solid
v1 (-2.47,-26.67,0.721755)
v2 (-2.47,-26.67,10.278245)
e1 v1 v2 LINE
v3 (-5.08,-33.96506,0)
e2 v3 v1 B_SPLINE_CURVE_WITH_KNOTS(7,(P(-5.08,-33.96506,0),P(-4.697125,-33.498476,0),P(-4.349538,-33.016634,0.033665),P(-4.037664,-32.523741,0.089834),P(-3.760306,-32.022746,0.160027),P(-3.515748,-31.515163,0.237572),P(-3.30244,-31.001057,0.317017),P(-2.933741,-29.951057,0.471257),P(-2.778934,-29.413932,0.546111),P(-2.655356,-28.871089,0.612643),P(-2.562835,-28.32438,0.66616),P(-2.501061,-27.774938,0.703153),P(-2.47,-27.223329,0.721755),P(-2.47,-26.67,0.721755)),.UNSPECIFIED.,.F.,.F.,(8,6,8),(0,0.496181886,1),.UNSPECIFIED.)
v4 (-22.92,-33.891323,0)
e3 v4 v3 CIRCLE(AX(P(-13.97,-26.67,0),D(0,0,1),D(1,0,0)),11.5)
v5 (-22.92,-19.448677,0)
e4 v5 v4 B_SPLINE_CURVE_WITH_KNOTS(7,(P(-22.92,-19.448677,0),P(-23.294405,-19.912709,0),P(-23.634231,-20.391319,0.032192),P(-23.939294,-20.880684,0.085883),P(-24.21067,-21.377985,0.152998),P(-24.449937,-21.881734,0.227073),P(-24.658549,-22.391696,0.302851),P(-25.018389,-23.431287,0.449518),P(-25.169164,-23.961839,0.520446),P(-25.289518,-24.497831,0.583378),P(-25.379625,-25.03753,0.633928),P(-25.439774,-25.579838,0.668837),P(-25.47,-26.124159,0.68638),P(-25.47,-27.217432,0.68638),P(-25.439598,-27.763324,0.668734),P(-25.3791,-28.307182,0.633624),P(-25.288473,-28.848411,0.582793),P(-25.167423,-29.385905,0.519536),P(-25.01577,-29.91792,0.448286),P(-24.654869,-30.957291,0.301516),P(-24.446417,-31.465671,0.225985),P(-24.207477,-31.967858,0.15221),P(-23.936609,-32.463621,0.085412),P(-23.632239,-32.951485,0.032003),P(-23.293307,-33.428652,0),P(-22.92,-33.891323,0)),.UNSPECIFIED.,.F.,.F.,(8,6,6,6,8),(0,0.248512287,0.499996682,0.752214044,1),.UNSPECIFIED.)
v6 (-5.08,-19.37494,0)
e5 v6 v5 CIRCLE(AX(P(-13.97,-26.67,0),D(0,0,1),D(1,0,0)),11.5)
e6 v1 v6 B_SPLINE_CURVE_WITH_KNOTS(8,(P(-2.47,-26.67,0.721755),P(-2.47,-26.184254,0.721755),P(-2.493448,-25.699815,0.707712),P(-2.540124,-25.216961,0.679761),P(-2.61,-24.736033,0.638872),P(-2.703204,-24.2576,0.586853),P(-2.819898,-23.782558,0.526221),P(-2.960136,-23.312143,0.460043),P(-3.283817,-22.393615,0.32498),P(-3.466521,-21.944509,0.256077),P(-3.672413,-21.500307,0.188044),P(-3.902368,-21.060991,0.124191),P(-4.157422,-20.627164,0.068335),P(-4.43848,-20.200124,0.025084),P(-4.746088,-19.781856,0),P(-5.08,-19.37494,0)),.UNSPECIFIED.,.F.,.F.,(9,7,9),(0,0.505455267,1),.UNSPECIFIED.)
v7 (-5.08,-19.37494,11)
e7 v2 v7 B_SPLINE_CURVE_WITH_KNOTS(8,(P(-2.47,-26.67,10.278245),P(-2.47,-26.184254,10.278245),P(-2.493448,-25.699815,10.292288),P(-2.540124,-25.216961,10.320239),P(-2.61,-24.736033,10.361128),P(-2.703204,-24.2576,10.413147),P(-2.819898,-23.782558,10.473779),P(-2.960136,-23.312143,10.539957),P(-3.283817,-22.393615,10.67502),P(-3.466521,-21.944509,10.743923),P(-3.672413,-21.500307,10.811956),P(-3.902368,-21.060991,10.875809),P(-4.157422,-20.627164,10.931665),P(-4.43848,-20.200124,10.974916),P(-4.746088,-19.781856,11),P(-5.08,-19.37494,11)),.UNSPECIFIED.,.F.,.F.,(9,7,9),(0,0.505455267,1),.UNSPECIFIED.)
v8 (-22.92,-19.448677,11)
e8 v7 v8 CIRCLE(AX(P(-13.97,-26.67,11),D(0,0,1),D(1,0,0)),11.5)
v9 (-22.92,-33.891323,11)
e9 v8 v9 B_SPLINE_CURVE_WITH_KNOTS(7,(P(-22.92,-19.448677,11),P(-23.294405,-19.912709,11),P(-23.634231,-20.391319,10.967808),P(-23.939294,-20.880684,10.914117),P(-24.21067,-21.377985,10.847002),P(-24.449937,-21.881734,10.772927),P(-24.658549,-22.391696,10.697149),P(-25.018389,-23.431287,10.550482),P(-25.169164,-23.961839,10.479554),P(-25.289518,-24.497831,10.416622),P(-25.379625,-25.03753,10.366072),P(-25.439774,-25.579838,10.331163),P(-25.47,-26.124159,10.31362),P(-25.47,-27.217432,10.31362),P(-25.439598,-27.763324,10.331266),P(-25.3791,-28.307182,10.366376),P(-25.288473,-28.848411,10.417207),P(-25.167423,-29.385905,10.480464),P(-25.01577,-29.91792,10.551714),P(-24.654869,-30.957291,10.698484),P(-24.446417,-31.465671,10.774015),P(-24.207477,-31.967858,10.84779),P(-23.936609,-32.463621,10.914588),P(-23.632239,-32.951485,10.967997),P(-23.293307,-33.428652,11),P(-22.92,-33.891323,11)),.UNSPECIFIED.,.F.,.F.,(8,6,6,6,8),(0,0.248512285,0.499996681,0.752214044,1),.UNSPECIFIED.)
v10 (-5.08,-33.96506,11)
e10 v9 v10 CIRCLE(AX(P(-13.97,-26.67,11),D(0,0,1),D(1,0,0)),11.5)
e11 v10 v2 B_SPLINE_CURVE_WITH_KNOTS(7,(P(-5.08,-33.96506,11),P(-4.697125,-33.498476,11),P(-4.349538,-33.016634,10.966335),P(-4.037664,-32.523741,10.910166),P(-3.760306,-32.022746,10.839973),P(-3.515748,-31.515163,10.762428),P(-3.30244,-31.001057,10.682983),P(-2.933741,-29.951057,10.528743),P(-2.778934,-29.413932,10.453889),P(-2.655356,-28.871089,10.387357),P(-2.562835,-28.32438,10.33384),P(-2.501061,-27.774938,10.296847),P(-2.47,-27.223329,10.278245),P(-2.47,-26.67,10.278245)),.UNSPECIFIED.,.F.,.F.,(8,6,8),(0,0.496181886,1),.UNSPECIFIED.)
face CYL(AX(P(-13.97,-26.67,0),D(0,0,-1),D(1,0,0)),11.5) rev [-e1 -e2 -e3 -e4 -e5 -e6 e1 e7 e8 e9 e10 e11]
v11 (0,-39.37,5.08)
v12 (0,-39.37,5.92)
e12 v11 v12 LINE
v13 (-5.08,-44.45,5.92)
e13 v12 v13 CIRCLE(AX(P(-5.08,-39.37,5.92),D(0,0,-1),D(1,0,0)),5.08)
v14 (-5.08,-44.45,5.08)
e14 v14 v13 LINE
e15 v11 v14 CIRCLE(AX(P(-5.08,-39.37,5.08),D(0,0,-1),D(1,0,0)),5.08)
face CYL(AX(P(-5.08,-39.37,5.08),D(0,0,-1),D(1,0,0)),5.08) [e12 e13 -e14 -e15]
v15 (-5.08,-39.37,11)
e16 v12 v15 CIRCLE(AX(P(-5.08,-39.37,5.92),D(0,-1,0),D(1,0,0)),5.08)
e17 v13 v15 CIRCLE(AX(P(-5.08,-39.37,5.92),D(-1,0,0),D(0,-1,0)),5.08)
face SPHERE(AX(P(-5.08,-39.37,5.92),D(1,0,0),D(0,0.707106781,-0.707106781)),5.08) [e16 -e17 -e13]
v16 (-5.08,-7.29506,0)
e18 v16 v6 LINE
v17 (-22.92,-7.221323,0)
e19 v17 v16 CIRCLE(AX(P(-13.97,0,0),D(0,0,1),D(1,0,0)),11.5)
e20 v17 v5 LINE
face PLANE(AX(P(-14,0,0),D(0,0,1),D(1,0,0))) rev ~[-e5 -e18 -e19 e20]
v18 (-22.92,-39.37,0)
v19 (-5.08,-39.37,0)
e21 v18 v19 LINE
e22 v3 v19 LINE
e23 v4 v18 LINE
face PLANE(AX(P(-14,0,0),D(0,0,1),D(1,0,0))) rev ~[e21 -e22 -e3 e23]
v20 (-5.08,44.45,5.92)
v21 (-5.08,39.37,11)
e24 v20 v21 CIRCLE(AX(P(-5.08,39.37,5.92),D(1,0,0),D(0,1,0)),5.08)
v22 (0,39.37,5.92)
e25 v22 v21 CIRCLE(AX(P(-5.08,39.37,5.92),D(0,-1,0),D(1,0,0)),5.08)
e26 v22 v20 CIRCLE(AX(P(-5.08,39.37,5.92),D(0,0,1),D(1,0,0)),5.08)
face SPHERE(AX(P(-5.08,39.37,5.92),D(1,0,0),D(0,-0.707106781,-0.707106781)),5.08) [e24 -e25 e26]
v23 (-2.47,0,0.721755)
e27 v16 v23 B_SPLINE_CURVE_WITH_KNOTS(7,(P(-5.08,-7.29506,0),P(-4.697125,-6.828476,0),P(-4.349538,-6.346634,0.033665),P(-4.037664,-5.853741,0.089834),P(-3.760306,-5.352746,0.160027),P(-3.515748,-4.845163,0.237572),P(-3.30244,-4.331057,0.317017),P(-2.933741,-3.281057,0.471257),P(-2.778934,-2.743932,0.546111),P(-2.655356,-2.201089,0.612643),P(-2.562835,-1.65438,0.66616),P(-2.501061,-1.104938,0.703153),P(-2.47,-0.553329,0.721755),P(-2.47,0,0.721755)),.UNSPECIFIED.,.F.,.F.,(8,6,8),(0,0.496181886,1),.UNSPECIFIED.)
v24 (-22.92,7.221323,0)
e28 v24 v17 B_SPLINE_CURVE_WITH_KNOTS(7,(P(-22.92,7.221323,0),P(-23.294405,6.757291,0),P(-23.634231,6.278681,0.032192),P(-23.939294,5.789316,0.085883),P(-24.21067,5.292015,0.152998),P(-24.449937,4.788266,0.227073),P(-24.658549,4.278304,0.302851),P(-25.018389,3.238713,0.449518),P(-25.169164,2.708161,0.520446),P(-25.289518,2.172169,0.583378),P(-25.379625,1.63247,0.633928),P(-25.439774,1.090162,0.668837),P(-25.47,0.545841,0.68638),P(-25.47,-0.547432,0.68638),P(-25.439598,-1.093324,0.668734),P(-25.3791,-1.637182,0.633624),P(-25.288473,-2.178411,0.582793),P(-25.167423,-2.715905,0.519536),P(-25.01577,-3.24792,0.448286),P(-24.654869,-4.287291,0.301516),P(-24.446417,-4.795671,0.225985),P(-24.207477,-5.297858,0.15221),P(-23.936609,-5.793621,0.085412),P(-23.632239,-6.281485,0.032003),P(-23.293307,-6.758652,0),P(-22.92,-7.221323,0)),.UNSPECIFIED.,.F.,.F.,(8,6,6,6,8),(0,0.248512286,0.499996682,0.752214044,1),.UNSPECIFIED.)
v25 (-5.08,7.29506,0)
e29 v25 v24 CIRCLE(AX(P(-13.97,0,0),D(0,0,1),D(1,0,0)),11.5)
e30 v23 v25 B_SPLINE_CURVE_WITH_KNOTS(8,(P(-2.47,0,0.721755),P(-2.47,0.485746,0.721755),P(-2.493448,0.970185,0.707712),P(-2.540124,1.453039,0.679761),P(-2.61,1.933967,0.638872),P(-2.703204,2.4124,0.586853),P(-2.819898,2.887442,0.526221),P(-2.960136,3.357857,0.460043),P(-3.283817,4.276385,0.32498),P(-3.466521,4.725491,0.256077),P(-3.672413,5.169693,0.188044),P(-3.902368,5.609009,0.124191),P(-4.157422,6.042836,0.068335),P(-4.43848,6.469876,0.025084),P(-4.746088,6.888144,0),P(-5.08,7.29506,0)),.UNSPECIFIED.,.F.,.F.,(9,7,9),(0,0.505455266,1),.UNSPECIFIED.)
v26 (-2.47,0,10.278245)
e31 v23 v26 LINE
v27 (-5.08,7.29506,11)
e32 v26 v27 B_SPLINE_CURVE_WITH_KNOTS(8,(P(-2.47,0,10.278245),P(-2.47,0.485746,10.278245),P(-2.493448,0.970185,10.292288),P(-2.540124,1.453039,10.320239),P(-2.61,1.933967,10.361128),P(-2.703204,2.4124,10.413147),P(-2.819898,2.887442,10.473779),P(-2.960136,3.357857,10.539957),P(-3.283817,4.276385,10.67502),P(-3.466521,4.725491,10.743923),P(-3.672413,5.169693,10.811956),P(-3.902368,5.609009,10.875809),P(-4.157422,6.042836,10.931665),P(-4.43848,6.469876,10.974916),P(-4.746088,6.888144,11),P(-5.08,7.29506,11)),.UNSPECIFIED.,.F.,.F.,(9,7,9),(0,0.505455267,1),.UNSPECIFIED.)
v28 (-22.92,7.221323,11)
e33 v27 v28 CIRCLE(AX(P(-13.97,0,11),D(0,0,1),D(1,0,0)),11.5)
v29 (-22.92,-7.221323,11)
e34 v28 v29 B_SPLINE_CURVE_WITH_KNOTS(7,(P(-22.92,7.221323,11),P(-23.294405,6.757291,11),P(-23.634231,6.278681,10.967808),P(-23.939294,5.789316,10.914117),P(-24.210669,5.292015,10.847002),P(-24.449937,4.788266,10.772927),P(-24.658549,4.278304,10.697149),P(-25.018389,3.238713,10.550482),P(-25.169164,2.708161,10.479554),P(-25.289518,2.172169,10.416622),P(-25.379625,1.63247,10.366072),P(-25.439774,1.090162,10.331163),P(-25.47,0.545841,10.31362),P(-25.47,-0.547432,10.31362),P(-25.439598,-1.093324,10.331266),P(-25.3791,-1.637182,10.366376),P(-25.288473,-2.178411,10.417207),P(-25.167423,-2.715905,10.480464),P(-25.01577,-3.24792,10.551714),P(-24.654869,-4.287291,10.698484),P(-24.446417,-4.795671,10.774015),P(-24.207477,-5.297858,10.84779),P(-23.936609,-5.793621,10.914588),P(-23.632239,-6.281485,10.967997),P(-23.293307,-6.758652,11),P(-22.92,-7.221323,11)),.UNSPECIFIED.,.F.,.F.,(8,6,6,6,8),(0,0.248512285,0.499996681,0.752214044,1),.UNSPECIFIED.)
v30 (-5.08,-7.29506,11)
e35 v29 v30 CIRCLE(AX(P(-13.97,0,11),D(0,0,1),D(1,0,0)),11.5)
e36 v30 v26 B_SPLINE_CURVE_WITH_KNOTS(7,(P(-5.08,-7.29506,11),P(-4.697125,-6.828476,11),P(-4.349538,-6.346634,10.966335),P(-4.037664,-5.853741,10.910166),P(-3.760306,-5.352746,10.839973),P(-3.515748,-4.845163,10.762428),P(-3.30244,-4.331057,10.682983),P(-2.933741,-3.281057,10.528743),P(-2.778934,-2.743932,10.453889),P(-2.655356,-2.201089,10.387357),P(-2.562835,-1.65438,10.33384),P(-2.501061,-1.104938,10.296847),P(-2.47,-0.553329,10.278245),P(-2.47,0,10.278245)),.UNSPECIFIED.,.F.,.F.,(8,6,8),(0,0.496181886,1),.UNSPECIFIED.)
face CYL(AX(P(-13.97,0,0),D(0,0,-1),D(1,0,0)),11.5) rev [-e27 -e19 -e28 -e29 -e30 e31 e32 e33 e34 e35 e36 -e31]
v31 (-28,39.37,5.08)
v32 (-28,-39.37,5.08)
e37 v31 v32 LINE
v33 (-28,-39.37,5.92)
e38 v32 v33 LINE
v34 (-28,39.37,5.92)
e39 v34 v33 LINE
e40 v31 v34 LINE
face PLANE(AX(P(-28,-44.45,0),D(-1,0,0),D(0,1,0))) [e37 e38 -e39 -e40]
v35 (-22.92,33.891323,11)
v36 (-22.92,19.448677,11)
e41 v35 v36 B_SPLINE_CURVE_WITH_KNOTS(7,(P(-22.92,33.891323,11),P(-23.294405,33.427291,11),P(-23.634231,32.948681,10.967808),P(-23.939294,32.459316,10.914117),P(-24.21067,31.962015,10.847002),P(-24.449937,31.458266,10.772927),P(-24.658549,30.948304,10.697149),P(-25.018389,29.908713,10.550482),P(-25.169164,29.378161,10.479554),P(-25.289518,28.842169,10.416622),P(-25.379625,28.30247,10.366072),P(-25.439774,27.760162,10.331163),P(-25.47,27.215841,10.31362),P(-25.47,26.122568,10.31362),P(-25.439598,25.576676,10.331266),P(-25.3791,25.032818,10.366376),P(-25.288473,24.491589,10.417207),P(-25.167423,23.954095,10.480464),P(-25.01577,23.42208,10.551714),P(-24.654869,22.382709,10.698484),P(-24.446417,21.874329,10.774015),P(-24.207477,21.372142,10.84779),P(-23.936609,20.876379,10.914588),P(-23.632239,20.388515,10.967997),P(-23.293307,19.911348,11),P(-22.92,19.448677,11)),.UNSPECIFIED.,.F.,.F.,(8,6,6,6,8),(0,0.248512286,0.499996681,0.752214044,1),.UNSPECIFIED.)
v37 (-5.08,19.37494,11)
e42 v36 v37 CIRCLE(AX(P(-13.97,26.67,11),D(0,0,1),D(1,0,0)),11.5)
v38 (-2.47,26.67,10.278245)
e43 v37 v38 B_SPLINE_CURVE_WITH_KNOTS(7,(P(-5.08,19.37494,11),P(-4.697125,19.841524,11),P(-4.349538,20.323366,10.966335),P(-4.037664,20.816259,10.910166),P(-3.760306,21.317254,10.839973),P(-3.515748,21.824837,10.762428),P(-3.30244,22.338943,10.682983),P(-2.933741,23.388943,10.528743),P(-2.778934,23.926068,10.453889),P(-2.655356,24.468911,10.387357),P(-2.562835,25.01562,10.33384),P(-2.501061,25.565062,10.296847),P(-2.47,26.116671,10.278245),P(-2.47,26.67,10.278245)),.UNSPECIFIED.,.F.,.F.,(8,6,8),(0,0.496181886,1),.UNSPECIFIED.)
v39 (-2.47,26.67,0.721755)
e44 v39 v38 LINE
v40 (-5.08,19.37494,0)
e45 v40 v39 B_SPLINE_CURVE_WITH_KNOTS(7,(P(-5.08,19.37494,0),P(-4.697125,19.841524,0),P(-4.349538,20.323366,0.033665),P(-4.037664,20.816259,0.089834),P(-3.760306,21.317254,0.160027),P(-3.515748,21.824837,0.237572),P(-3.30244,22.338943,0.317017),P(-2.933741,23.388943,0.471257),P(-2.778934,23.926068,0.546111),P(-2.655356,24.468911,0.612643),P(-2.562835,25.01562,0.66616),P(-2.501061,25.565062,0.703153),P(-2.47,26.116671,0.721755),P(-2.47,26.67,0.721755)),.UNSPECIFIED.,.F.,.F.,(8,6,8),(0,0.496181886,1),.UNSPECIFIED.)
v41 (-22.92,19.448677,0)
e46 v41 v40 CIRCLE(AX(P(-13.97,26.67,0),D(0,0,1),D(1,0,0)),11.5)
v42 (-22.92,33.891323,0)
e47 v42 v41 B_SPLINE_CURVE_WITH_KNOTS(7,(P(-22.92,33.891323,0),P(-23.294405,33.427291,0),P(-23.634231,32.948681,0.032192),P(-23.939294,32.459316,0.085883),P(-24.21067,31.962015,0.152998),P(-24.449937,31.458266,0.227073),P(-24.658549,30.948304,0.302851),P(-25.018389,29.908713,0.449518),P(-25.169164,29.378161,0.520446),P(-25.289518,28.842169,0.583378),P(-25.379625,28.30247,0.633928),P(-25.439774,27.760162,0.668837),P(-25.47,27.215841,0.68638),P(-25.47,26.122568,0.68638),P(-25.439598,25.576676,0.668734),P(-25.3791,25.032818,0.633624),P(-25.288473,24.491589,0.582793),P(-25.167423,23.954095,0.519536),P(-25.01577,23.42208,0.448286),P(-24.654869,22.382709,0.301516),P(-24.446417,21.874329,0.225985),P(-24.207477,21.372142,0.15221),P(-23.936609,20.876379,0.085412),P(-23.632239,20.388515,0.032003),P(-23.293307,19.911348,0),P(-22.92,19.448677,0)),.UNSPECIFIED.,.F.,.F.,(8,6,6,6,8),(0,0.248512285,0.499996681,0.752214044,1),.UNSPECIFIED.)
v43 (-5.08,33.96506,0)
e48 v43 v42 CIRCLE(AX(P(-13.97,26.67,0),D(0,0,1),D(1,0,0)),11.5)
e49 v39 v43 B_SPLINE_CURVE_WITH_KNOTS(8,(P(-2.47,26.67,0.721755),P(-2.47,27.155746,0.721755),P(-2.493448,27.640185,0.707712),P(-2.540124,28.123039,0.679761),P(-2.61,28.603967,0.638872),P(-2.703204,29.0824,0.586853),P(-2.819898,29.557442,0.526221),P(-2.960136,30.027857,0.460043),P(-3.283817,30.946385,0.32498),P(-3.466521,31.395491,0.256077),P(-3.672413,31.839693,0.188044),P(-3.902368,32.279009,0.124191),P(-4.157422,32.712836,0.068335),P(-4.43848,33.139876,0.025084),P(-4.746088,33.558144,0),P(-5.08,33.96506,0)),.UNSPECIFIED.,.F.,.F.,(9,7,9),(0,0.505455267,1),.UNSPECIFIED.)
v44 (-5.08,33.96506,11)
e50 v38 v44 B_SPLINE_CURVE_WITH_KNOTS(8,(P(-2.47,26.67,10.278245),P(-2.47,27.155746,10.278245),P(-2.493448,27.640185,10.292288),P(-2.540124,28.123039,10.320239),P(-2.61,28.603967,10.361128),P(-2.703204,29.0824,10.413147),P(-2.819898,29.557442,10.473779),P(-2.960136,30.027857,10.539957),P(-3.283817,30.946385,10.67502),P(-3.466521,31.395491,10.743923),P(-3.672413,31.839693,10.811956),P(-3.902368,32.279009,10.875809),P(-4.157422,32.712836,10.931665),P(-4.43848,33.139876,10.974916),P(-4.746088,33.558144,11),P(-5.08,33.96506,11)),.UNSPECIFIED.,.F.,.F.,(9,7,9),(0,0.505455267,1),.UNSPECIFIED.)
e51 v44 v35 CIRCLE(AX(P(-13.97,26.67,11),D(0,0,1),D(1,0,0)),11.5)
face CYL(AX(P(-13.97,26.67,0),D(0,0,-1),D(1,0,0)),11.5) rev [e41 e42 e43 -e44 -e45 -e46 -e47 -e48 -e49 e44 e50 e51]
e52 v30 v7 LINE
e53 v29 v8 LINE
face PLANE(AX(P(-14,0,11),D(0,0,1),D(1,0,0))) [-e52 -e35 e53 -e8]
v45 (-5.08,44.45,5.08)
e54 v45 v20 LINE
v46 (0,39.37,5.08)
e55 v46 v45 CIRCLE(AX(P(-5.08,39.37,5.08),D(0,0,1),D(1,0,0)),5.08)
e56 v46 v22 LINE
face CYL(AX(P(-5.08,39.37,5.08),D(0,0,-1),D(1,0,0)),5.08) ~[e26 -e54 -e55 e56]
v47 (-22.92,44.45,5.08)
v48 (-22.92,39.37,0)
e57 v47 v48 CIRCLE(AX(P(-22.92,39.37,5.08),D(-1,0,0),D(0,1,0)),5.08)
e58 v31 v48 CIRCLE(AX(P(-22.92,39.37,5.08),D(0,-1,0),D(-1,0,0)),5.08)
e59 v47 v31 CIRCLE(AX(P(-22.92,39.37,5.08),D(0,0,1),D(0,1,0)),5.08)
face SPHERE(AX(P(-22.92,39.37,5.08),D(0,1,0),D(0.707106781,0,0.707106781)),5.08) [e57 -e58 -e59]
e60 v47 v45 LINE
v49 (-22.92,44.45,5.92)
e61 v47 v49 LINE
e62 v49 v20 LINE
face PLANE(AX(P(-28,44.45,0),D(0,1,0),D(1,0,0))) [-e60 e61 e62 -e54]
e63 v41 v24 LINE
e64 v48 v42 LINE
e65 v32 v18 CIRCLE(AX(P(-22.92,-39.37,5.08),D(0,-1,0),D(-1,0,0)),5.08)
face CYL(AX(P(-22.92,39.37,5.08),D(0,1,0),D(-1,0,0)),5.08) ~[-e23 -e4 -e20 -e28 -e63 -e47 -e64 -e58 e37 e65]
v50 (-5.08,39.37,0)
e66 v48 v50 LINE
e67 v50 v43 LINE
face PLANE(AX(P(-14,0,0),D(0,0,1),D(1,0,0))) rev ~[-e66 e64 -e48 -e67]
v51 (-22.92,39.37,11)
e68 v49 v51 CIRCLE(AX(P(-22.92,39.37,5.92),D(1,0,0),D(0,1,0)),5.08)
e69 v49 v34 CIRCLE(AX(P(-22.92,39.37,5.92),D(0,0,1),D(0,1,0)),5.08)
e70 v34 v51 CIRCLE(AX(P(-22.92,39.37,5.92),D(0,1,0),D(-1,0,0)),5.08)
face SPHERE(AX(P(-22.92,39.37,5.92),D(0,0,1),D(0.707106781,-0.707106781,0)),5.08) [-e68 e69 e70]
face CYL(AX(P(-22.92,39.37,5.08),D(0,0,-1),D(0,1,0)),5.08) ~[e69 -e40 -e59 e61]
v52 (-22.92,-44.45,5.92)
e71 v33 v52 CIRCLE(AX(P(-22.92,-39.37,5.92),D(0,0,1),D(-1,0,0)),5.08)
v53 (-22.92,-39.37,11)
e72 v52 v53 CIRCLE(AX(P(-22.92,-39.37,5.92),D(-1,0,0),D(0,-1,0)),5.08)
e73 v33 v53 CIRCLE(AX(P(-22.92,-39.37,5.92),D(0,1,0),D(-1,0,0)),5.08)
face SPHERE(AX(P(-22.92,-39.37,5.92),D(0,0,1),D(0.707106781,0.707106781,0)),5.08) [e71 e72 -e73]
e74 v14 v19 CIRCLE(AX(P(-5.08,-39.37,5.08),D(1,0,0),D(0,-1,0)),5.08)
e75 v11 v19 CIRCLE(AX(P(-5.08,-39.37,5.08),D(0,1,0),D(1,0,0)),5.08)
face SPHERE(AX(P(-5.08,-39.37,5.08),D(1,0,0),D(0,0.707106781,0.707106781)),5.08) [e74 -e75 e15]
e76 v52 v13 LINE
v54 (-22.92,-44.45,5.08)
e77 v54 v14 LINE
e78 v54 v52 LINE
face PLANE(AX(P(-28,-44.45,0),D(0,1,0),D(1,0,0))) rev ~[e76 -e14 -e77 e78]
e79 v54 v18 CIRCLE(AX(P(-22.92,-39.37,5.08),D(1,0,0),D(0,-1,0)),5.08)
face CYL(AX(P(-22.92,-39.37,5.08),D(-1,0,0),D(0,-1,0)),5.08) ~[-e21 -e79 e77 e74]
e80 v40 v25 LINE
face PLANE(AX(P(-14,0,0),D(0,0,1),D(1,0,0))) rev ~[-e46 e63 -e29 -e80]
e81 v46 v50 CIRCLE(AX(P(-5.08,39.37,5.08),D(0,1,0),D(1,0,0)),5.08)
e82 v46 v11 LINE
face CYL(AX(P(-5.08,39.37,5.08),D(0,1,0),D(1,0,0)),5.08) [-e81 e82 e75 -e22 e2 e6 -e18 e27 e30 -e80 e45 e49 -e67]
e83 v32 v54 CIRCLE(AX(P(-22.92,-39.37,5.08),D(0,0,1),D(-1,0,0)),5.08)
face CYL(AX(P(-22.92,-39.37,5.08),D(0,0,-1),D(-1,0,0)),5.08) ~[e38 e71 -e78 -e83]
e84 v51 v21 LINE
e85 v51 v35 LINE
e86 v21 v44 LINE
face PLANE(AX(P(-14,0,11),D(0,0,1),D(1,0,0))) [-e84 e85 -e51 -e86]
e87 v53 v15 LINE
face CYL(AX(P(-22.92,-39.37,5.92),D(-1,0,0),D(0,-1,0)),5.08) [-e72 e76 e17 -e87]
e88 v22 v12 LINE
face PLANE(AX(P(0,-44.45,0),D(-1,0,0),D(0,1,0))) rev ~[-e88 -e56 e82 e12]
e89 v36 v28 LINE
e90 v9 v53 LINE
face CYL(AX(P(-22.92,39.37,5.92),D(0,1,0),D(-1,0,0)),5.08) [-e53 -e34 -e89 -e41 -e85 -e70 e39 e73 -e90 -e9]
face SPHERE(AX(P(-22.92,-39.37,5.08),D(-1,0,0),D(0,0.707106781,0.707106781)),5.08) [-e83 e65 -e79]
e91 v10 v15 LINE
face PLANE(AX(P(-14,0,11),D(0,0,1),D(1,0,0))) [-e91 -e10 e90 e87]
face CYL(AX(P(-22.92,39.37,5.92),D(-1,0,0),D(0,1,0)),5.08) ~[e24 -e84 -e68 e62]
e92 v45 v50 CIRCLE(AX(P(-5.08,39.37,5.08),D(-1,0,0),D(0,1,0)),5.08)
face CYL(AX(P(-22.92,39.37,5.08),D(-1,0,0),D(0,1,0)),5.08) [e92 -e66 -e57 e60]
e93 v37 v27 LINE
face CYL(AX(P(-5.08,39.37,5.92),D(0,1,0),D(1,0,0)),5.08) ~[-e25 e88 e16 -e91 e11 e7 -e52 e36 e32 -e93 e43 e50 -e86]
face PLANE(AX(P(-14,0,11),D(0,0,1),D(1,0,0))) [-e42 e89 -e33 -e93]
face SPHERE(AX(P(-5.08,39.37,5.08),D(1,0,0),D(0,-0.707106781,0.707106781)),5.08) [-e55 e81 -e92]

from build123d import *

# Parameters (mm, degrees)
F0_W         = 28
F0_H         = 88.9
F0_R         = 11.5
F1_DEPTH     = 11
F2_T1_DEPTH  = 78.74
F2_T3_DEPTH  = 17.84
F2_T5_DEPTH  = 0.84
F2_S9_W      = 5.08
F2_S9_H      = 5.08
F2_T10_DEPTH = 5.08
F2_S15_W     = 5.08
F2_S15_H     = 5.08
F2_T16_DEPTH = 5.08
F2_S21_W     = 5.08
F2_S21_H     = 5.08
F2_T22_DEPTH = 5.08
F2_S27_W     = 5.08
F2_S27_H     = 5.08
F2_T28_DEPTH = 5.08
F2_S33_W     = 5.08
F2_S33_H     = 5.08
F2_T34_DEPTH = 5.08
F2_S39_W     = 5.08
F2_S39_H     = 5.08
F2_T40_DEPTH = 5.08
F2_S45_W     = 5.08
F2_S45_H     = 5.08
F2_T46_DEPTH = 5.08
F2_S51_W     = 5.08
F2_S51_H     = 5.08
F2_T52_DEPTH = 5.08


# Not quite as in the source:
# - a fillet or chamfer that OpenCascade refuses, or shapes differently, is made with other operations: its cross-section is extruded or revolved along the edge and cut away or added


with BuildPart() as f1:
    # F0 (on Top) → F1 (new body)
    with BuildSketch(Plane.XY):
        with Locations((-14, 0)):
            Rectangle(F0_W, F0_H)
        with Locations((-13.97, -26.67)):
            Circle(F0_R, mode=Mode.SUBTRACT)
        with Locations((-13.97, 0)):
            Circle(F0_R, mode=Mode.SUBTRACT)
        with Locations((-13.97, 26.67)):
            Circle(F0_R, mode=Mode.SUBTRACT)
    extrude(amount=F1_DEPTH)

    # F2: fillet of radius 5.08 on 12 edges, made by hand

    # F2_s2 → F2_t1 (cut)
    with BuildSketch(Plane.XZ.offset(-39.37)):
        with BuildLine():
            ThreePointArc((0, 5.92), (-1.4878975516, 9.5121024484), (-5.08, 11))
            Line((-5.08, 11), (0, 11))
            Line((0, 11), (0, 5.92))
        make_face()
        with BuildLine():
            ThreePointArc((0, 5.08), (-1.4878975516, 1.4878975516), (-5.08, 0))
            Line((-5.08, 0), (0, 0))
            Line((0, 0), (0, 5.08))
        make_face()
        with BuildLine():
            ThreePointArc((-28, 5.92), (-26.5121024484, 9.5121024484), (-22.92, 11))
            Line((-22.92, 11), (-28, 11))
            Line((-28, 11), (-28, 5.92))
        make_face()
        with BuildLine():
            ThreePointArc((-28, 5.08), (-26.5121024484, 1.4878975516), (-22.92, 0))
            Line((-22.92, 0), (-28, 0))
            Line((-28, 0), (-28, 5.08))
        make_face()
    extrude(amount=F2_T1_DEPTH, mode=Mode.SUBTRACT)

    # F2_s4 → F2_t3 (cut)
    with BuildSketch(Plane.YZ.offset(-22.92)):
        with BuildLine():
            ThreePointArc((-44.45, 5.92), (-42.9621024484, 9.5121024484), (-39.37, 11))
            Line((-39.37, 11), (-44.45, 11))
            Line((-44.45, 11), (-44.45, 5.92))
        make_face()
        with BuildLine():
            ThreePointArc((-44.45, 5.08), (-42.9621024484, 1.4878975516), (-39.37, 0))
            Line((-39.37, 0), (-44.45, 0))
            Line((-44.45, 0), (-44.45, 5.08))
        make_face()
        with BuildLine():
            ThreePointArc((44.45, 5.92), (42.9621024484, 9.5121024484), (39.37, 11))
            Line((39.37, 11), (44.45, 11))
            Line((44.45, 11), (44.45, 5.92))
        make_face()
        with BuildLine():
            ThreePointArc((44.45, 5.08), (42.9621024484, 1.4878975516), (39.37, 0))
            Line((39.37, 0), (44.45, 0))
            Line((44.45, 0), (44.45, 5.08))
        make_face()
    extrude(amount=F2_T3_DEPTH, mode=Mode.SUBTRACT)

    # F2_s6 → F2_t5 (cut)
    with BuildSketch(Plane.XY.offset(5.08)):
        with BuildLine():
            ThreePointArc((0, -39.37), (-1.4878975516, -42.9621024484), (-5.08, -44.45))
            Line((-5.08, -44.45), (0, -44.45))
            Line((0, -44.45), (0, -39.37))
        make_face()
        with BuildLine():
            ThreePointArc((-28, -39.37), (-26.5121024484, -42.9621024484), (-22.92, -44.45))
            Line((-22.92, -44.45), (-28, -44.45))
            Line((-28, -44.45), (-28, -39.37))
        make_face()
        with BuildLine():
            ThreePointArc((-22.92, 44.45), (-26.5121024484, 42.9621024484), (-28, 39.37))
            Line((-28, 39.37), (-28, 44.45))
            Line((-28, 44.45), (-22.92, 44.45))
        make_face()
        with BuildLine():
            ThreePointArc((0, 39.37), (-1.4878975516, 42.9621024484), (-5.08, 44.45))
            Line((-5.08, 44.45), (0, 44.45))
            Line((0, 44.45), (0, 39.37))
        make_face()
    extrude(amount=F2_T5_DEPTH, mode=Mode.SUBTRACT)


with BuildPart() as f2_tool8:
    # F2_s9 → F2_t10 (new body)
    with BuildSketch(Plane.YZ.offset(-5.08)):
        with Locations((-41.91, 8.46)):
            Rectangle(F2_S9_W, F2_S9_H)
    extrude(amount=F2_T10_DEPTH)

    # F2_s11 → F2_t12 (revolve, cut)
    with BuildSketch(Plane(origin=(-5.08, -39.37, 5.92), x_dir=(0, 0.7071067812, -0.7071067812), z_dir=(0, -0.7071067812, -0.7071067812))):
        with BuildLine():
            ThreePointArc((0, -5.08), (5.08, 0), (0, 5.08))
            Line((0, 5.08), (0, -5.08))
        make_face()
    revolve(axis=Axis((-5.08, -39.37, 5.92), (1, 0, 0)), mode=Mode.SUBTRACT)


with BuildPart() as f1_1:
    add(f1.part)

    # F2_t7: cut F2_tool8
    add(f2_tool8.part, mode=Mode.SUBTRACT)


with BuildPart() as f2_tool14:
    # F2_s15 → F2_t16 (new body)
    with BuildSketch(Plane.YZ.offset(-5.08)):
        with Locations((41.91, 8.46)):
            Rectangle(F2_S15_W, F2_S15_H)
    extrude(amount=F2_T16_DEPTH)

    # F2_s17 → F2_t18 (revolve, cut)
    with BuildSketch(Plane(origin=(-5.08, 39.37, 5.92), x_dir=(0, -0.7071067812, -0.7071067812), z_dir=(0, -0.7071067812, 0.7071067812))):
        with BuildLine():
            ThreePointArc((0, -5.08), (5.08, 0), (0, 5.08))
            Line((0, 5.08), (0, -5.08))
        make_face()
    revolve(axis=Axis((-5.08, 39.37, 5.92), (1, 0, 0)), mode=Mode.SUBTRACT)


with BuildPart() as f1_2:
    add(f1_1.part)

    # F2_t13: cut F2_tool14
    add(f2_tool14.part, mode=Mode.SUBTRACT)


with BuildPart() as f2_tool20:
    # F2_s21 → F2_t22 (new body)
    with BuildSketch(Plane.XY.offset(5.92)):
        with Locations((-25.46, -41.91)):
            Rectangle(F2_S21_W, F2_S21_H)
    extrude(amount=F2_T22_DEPTH)

    # F2_s23 → F2_t24 (revolve, cut)
    with BuildSketch(Plane(origin=(-22.92, -39.37, 5.92), x_dir=(0.7071067812, 0.7071067812, 0), z_dir=(0.7071067812, -0.7071067812, 0))):
        with BuildLine():
            ThreePointArc((0, -5.08), (5.08, 0), (0, 5.08))
            Line((0, 5.08), (0, -5.08))
        make_face()
    revolve(axis=Axis((-22.92, -39.37, 5.92), (0, 0, 1)), mode=Mode.SUBTRACT)


with BuildPart() as f1_3:
    add(f1_2.part)

    # F2_t19: cut F2_tool20
    add(f2_tool20.part, mode=Mode.SUBTRACT)


with BuildPart() as f2_tool26:
    # F2_s27 → F2_t28 (new body)
    with BuildSketch(Plane.YZ.offset(-22.92)):
        with Locations((-41.91, 2.54)):
            Rectangle(F2_S27_W, F2_S27_H)
    extrude(amount=-F2_T28_DEPTH)

    # F2_s29 → F2_t30 (revolve, cut)
    with BuildSketch(Plane(origin=(-22.92, -39.37, 5.08), x_dir=(0, 0.7071067812, 0.7071067812), z_dir=(0, -0.7071067812, 0.7071067812))):
        with BuildLine():
            ThreePointArc((0, -5.08), (5.08, 0), (0, 5.08))
            Line((0, 5.08), (0, -5.08))
        make_face()
    revolve(axis=Axis((-22.92, -39.37, 5.08), (-1, 0, 0)), mode=Mode.SUBTRACT)


with BuildPart() as f1_4:
    add(f1_3.part)

    # F2_t25: cut F2_tool26
    add(f2_tool26.part, mode=Mode.SUBTRACT)


with BuildPart() as f2_tool32:
    # F2_s33 → F2_t34 (new body)
    with BuildSketch(Plane.YZ.offset(-5.08)):
        with Locations((-41.91, 2.54)):
            Rectangle(F2_S33_W, F2_S33_H)
    extrude(amount=F2_T34_DEPTH)

    # F2_s35 → F2_t36 (revolve, cut)
    with BuildSketch(Plane(origin=(-5.08, -39.37, 5.08), x_dir=(0, 0.7071067812, 0.7071067812), z_dir=(0, 0.7071067812, -0.7071067812))):
        with BuildLine():
            ThreePointArc((0, -5.08), (5.08, 0), (0, 5.08))
            Line((0, 5.08), (0, -5.08))
        make_face()
    revolve(axis=Axis((-5.08, -39.37, 5.08), (1, 0, 0)), mode=Mode.SUBTRACT)


with BuildPart() as f1_5:
    add(f1_4.part)

    # F2_t31: cut F2_tool32
    add(f2_tool32.part, mode=Mode.SUBTRACT)


with BuildPart() as f2_tool38:
    # F2_s39 → F2_t40 (new body)
    with BuildSketch(Plane.YZ.offset(-5.08)):
        with Locations((41.91, 2.54)):
            Rectangle(F2_S39_W, F2_S39_H)
    extrude(amount=F2_T40_DEPTH)

    # F2_s41 → F2_t42 (revolve, cut)
    with BuildSketch(Plane(origin=(-5.08, 39.37, 5.08), x_dir=(0, -0.7071067812, 0.7071067812), z_dir=(0, 0.7071067812, 0.7071067812))):
        with BuildLine():
            ThreePointArc((0, -5.08), (5.08, 0), (0, 5.08))
            Line((0, 5.08), (0, -5.08))
        make_face()
    revolve(axis=Axis((-5.08, 39.37, 5.08), (1, 0, 0)), mode=Mode.SUBTRACT)


with BuildPart() as f1_6:
    add(f1_5.part)

    # F2_t37: cut F2_tool38
    add(f2_tool38.part, mode=Mode.SUBTRACT)


with BuildPart() as f2_tool44:
    # F2_s45 → F2_t46 (new body)
    with BuildSketch(Plane.XY.offset(5.92)):
        with Locations((-25.46, 41.91)):
            Rectangle(F2_S45_W, F2_S45_H)
    extrude(amount=F2_T46_DEPTH)

    # F2_s47 → F2_t48 (revolve, cut)
    with BuildSketch(Plane(origin=(-22.92, 39.37, 5.92), x_dir=(0.7071067812, -0.7071067812, 0), z_dir=(-0.7071067812, -0.7071067812, 0))):
        with BuildLine():
            ThreePointArc((0, -5.08), (5.08, 0), (0, 5.08))
            Line((0, 5.08), (0, -5.08))
        make_face()
    revolve(axis=Axis((-22.92, 39.37, 5.92), (0, 0, 1)), mode=Mode.SUBTRACT)


with BuildPart() as f1_7:
    add(f1_6.part)

    # F2_t43: cut F2_tool44
    add(f2_tool44.part, mode=Mode.SUBTRACT)


with BuildPart() as f2_tool50:
    # F2_s51 → F2_t52 (new body)
    with BuildSketch(Plane.XZ.offset(-39.37)):
        with Locations((-25.46, 2.54)):
            Rectangle(F2_S51_W, F2_S51_H)
    extrude(amount=-F2_T52_DEPTH)

    # F2_s53 → F2_t54 (revolve, cut)
    with BuildSketch(Plane(origin=(-22.92, 39.37, 5.08), x_dir=(0.7071067812, 0, 0.7071067812), z_dir=(-0.7071067812, 0, 0.7071067812))):
        with BuildLine():
            ThreePointArc((0, -5.08), (5.08, 0), (0, 5.08))
            Line((0, 5.08), (0, -5.08))
        make_face()
    revolve(axis=Axis((-22.92, 39.37, 5.08), (0, 1, 0)), mode=Mode.SUBTRACT)


with BuildPart() as f1_8:
    add(f1_7.part)

    # F2_t49: cut F2_tool50
    add(f2_tool50.part, mode=Mode.SUBTRACT)


solid = f1_8.part
